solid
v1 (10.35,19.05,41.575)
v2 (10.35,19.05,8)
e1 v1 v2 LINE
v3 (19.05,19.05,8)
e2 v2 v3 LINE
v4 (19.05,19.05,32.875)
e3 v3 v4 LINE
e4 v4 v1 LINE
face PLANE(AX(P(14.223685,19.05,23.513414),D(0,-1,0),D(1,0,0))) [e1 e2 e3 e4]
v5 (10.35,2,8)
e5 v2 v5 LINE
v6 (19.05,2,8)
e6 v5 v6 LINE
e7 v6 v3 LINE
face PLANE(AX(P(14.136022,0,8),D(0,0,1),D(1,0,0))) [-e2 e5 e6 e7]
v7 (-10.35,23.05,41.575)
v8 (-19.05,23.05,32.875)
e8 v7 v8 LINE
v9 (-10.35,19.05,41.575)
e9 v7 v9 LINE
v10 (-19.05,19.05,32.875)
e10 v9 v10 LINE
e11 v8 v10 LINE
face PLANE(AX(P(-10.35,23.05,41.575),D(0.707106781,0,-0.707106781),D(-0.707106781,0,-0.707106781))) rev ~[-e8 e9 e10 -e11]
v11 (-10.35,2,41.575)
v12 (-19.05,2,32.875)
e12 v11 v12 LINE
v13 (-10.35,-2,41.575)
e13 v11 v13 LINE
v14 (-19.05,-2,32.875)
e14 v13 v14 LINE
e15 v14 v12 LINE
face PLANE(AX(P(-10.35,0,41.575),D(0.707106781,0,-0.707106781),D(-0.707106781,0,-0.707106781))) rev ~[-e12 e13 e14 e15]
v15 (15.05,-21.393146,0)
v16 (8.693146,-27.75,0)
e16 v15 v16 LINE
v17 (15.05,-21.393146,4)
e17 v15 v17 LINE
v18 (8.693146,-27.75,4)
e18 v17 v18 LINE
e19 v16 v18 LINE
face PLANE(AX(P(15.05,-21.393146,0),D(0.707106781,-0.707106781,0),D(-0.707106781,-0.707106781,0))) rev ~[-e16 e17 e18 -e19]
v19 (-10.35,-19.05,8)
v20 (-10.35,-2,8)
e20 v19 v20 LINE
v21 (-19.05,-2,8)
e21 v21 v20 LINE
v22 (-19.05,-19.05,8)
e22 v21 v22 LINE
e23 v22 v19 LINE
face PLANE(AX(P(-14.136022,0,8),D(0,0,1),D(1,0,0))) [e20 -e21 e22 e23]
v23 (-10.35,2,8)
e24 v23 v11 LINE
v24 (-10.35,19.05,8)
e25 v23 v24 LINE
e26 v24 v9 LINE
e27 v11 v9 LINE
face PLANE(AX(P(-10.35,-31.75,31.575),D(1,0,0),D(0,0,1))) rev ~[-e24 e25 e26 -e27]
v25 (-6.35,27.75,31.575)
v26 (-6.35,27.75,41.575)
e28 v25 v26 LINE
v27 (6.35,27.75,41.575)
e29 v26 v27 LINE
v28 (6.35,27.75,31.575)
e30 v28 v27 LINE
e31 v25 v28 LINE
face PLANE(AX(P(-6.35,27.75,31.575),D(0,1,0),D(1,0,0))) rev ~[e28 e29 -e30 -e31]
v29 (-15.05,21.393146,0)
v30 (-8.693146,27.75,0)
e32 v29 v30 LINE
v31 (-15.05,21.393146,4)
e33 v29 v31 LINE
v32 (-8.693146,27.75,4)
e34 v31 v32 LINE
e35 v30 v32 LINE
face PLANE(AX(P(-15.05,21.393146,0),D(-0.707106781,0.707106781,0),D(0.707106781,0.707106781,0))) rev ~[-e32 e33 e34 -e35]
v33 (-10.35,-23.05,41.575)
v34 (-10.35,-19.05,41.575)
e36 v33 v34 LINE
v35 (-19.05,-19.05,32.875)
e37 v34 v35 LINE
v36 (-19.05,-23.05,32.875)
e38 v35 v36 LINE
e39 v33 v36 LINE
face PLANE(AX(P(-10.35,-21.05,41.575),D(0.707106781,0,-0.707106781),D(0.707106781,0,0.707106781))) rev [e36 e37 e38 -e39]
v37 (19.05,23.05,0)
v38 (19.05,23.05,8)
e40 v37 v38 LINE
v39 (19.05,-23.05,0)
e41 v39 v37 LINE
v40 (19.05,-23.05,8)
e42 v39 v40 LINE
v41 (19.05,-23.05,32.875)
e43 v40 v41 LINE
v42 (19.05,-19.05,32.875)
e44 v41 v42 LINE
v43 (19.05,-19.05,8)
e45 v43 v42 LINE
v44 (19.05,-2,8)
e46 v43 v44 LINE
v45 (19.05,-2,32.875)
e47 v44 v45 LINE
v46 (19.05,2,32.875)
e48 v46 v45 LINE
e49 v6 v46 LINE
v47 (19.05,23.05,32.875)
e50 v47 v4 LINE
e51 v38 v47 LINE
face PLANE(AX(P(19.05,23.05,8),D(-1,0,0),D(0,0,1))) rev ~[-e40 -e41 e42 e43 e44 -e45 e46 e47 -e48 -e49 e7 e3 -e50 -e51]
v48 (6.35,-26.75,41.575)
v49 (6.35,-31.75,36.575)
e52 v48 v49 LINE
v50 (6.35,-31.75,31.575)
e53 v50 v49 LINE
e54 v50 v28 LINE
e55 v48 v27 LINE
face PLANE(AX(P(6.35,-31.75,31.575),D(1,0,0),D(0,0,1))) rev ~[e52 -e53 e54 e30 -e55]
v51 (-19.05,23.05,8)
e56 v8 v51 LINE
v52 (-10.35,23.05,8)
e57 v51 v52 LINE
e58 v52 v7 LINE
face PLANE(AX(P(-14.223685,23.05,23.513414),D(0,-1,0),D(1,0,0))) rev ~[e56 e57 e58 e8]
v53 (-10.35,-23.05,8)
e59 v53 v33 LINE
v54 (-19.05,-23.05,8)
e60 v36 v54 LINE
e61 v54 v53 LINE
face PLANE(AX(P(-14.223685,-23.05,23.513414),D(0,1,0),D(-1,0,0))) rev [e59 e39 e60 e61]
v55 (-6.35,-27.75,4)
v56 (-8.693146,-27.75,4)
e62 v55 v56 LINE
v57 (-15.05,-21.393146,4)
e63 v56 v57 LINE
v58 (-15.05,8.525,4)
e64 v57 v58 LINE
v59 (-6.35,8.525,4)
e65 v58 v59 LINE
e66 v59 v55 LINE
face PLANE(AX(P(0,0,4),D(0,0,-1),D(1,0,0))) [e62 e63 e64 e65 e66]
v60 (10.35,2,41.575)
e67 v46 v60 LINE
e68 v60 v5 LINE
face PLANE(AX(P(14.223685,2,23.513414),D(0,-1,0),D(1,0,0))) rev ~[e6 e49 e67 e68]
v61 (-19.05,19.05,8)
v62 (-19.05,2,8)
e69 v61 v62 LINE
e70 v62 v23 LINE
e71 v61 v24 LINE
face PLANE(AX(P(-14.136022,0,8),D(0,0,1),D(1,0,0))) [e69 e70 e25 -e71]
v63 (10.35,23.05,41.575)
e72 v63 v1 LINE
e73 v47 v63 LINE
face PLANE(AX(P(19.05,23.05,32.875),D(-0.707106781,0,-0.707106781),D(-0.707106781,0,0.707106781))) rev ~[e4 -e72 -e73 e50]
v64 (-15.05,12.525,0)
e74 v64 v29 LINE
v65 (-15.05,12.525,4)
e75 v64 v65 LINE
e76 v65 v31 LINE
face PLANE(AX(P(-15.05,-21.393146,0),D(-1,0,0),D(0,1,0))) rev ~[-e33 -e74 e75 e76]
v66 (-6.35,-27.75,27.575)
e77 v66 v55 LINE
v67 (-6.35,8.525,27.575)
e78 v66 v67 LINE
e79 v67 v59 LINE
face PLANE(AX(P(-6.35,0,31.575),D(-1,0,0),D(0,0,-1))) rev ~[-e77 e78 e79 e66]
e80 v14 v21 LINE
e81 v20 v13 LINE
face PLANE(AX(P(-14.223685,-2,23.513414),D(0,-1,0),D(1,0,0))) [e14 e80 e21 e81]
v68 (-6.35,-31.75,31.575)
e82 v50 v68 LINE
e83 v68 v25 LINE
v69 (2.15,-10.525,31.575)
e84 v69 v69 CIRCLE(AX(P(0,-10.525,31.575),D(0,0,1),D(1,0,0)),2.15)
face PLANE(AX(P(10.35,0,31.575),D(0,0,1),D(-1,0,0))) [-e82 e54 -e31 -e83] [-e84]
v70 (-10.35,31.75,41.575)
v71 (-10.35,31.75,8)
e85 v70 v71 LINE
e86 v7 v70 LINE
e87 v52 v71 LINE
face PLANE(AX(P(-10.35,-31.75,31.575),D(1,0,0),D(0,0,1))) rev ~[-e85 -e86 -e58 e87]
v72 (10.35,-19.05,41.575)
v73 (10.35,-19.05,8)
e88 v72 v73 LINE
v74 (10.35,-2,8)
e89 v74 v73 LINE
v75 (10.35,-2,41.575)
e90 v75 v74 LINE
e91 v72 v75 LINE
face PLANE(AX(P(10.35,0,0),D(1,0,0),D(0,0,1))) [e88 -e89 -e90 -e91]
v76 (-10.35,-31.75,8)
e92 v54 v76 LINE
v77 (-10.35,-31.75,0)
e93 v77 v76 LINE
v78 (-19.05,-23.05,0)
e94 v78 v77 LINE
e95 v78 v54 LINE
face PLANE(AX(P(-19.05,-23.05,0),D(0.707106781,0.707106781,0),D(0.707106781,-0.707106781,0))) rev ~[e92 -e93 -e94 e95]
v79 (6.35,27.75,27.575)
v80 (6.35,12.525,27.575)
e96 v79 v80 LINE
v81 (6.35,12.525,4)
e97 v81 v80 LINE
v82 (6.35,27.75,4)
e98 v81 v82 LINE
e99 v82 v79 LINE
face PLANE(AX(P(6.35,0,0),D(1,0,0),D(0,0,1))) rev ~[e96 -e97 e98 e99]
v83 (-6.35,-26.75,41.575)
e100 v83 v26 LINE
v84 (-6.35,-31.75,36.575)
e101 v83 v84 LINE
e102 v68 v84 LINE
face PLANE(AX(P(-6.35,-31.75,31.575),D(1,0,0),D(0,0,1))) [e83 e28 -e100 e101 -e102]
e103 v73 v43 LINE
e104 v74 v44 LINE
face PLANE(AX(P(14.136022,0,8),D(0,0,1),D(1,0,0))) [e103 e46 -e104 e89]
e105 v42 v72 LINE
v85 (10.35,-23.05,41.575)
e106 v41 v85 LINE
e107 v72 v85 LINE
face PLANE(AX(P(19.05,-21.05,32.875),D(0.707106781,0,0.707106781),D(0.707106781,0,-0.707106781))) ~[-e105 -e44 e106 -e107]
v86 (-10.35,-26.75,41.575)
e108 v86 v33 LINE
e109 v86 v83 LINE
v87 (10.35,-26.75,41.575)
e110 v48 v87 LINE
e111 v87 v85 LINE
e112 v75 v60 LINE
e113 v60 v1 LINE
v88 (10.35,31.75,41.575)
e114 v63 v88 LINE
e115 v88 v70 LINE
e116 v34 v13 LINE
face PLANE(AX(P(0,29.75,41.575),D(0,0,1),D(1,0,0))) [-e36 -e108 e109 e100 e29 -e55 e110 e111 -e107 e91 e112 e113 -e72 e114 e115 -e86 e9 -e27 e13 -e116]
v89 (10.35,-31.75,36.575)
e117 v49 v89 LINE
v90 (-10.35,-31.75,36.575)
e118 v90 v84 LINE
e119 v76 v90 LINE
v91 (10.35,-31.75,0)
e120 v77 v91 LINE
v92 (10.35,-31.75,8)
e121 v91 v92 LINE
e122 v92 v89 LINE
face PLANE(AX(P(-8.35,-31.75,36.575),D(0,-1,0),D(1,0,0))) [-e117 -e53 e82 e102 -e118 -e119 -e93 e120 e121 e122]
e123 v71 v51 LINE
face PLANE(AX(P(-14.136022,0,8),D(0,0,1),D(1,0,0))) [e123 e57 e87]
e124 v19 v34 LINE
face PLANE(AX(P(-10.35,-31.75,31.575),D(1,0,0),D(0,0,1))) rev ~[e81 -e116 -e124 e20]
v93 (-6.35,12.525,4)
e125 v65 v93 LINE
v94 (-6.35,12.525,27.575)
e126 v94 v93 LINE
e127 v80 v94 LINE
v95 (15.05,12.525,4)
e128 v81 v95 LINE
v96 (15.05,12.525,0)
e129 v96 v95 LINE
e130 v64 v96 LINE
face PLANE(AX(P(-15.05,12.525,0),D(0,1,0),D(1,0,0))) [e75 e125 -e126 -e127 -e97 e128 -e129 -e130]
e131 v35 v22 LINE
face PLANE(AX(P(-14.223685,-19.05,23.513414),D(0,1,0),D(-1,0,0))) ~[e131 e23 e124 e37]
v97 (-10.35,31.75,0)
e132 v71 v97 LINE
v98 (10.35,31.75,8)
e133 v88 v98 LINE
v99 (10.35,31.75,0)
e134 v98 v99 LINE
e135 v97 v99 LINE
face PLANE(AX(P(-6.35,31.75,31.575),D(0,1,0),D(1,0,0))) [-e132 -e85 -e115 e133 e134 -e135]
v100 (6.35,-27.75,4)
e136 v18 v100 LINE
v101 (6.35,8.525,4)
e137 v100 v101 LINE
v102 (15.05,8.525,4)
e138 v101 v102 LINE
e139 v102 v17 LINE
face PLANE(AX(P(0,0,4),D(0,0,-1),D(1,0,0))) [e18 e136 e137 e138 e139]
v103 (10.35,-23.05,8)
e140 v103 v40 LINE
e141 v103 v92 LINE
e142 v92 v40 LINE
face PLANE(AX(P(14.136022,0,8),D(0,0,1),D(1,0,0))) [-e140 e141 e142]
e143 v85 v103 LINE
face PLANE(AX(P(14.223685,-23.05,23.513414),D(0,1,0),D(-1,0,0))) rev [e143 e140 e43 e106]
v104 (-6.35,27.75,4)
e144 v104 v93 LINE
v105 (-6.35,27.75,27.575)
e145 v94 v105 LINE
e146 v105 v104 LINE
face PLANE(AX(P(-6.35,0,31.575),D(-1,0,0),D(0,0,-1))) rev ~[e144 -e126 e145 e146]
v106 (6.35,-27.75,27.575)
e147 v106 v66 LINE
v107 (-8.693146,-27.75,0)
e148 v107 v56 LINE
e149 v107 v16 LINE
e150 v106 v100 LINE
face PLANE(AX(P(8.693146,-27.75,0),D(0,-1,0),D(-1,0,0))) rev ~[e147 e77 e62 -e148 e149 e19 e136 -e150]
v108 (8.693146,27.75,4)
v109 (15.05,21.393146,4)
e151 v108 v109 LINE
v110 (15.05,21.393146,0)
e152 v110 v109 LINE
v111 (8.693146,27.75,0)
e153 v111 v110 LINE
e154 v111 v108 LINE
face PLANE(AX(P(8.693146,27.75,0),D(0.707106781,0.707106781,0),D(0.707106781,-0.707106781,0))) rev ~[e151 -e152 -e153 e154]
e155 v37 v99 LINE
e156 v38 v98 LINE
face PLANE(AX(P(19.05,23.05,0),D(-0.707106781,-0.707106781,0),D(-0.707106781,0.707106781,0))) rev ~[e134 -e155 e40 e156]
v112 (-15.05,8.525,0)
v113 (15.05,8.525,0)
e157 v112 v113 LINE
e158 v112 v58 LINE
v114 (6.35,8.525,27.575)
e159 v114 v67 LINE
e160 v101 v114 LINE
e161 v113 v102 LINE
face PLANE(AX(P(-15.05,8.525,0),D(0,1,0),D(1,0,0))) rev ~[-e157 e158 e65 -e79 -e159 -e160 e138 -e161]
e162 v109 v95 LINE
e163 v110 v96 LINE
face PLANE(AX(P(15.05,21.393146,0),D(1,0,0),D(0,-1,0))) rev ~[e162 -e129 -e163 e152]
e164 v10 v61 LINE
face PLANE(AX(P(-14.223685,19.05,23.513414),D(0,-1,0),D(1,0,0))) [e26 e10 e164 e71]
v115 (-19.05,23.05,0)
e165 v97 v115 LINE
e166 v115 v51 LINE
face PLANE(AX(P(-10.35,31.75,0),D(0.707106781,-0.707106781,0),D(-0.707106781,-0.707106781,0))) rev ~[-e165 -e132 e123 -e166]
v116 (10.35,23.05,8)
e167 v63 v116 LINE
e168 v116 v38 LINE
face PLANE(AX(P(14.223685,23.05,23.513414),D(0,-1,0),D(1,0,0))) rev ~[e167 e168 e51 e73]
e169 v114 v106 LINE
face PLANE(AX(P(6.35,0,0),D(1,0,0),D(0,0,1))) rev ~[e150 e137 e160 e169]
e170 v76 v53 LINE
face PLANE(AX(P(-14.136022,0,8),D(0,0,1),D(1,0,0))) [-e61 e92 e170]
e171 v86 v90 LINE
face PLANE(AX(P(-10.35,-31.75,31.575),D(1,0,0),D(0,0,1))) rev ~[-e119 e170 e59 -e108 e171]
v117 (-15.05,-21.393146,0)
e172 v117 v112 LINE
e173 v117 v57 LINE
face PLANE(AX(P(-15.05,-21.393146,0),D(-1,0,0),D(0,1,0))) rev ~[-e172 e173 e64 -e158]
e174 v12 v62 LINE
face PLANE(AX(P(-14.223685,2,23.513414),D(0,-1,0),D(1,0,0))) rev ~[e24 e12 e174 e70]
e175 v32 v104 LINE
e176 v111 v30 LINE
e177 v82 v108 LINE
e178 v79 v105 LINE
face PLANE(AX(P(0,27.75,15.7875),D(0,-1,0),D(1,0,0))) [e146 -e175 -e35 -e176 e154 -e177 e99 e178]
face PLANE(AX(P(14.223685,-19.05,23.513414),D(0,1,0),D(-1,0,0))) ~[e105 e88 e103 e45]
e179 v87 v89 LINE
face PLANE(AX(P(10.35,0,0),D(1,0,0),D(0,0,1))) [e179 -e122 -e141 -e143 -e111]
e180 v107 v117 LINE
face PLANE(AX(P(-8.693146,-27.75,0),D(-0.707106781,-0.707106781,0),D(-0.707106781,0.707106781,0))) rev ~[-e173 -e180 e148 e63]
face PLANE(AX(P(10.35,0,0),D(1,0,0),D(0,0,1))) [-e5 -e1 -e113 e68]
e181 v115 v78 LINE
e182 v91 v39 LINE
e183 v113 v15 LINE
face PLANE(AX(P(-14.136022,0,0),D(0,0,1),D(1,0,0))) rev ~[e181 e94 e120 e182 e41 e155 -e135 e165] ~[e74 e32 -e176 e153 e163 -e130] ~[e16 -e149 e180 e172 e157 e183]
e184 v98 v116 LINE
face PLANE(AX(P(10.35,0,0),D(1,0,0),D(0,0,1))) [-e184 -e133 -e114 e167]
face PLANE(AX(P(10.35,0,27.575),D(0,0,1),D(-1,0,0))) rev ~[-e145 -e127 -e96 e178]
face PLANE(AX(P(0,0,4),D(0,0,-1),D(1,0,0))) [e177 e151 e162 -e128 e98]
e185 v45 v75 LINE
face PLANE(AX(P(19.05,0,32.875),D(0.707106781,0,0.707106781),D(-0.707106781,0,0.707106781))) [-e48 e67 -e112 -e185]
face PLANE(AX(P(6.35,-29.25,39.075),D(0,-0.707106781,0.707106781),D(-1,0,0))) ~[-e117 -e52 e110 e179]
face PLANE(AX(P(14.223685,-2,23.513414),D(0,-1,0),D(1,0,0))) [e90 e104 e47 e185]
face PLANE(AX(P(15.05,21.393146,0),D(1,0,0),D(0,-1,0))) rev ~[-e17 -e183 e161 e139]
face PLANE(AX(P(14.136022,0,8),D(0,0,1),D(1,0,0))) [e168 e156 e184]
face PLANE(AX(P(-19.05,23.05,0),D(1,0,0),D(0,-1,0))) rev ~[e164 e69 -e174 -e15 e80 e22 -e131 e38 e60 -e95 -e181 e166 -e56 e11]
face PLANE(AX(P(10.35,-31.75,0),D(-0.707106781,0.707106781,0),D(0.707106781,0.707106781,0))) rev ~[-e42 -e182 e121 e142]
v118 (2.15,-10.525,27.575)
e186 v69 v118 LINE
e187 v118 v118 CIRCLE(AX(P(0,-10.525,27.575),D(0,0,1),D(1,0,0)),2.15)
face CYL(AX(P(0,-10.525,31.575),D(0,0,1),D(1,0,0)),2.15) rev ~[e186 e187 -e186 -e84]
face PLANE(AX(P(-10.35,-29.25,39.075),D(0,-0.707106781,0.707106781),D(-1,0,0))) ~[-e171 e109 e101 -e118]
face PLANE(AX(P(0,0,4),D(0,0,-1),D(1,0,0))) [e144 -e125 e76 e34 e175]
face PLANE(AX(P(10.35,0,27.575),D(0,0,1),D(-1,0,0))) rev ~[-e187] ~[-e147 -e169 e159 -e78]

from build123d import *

# Parameters (mm, degrees)
F1_DEPTH  = 31.75
F2_T      = -4
F3_W      = 4
F3_H      = 10
F4_DEPTH  = 63.5
F6_DEPTH  = 8
F8_DEPTH  = 2
F11_DEPTH = 4
F13_DEPTH = 4
F14_W     = 12.7
F14_H     = 4
F15_DEPTH = 10
F16_SIZE  = 5
F17_R     = 2.15
F18_DEPTH = 25
F19_W     = 30.1
F19_H     = 4


# Not quite as in the source:
# - a pattern or mirror of a feature is missing from the dataset's text; its kind, count and spacing are read off the source's solid


with BuildPart() as f1:
    # F0 (on Front) → F1 (new body, symmetric)
    with BuildSketch(Plane.XZ):
        Polygon((-10.35, 0), (10.35, 0), (10.35, 31.575), (6.35, 31.575), (-6.35, 31.575), (-10.35, 31.575), align=None)
    extrude(amount=F1_DEPTH, both=True)

    # F2
    f2_openings = [f1.faces().sort_by_distance(p)[0] for p in [
        (0, 0, 0),
    ]]
    offset(amount=F2_T, openings=f2_openings)

    # F3 (on face) → F4 (join, through all)
    with BuildSketch(Plane.XZ.offset(31.75)):
        with Locations((-8.35, 36.575)):
            Rectangle(F3_W, F3_H)
        with Locations((8.35, 36.575)):
            Rectangle(F3_W, F3_H)
    extrude(amount=-F4_DEPTH)

    # F5 (on Top) → F6 (join)
    with BuildSketch(Plane.XY):
        Polygon((-19.05, -23.05), (-10.35, -31.75), (-10.35, 31.75), (-19.05, 23.05), align=None)
        Polygon((10.35, 31.75), (10.35, -31.75), (19.05, -23.05), (19.05, 23.05), align=None)
    extrude(amount=F6_DEPTH)

    # F7 (on Front) → F8 (join, symmetric)
    with BuildSketch(Plane.XZ):
        Polygon((-19.05, 8), (-10.35, 8), (-10.35, 41.575), (-19.05, 32.875), align=None)
        Polygon((10.35, 8), (19.05, 8), (19.05, 32.875), (10.35, 41.575), align=None)
    f8 = extrude(amount=F8_DEPTH, both=True)

    # F8_copies: F8 across plane
    add(f8.mirror(Plane(origin=(0, -10.525, 0), x_dir=(0, 0, -1), z_dir=(0, -1, 0))))

    # F10 (on plane+point) → F11 (join)
    with BuildSketch(Plane.XZ.offset(-23.05)):
        Polygon((10.35, 8), (19.05, 8), (19.05, 32.875), (10.35, 41.575), align=None)
        Polygon((-19.05, 32.875), (-19.05, 8), (-10.35, 8), (-10.35, 41.575), align=None)
    extrude(amount=F11_DEPTH)

    # F12 (on face) → F13 (cut)
    with BuildSketch(Plane(origin=(0, 0, 0), x_dir=(1, 0, 0), z_dir=(0, 0, -1))):
        Polygon((-8.6931457505, -27.75), (8.6931457505, -27.75), (15.05, -21.3931457505), (15.05, 21.3931457505), (8.6931457505, 27.75), (-8.6931457505, 27.75), (-15.05, 21.3931457505), (-15.05, -21.3931457505), align=None)
    extrude(amount=-F13_DEPTH, mode=Mode.SUBTRACT)

    # F14 (on face) → F15 (join, through all)
    with BuildSketch(Plane.XY.offset(31.575)):
        with Locations((0, 29.75)):
            Rectangle(F14_W, F14_H)
    extrude(amount=F15_DEPTH)

    # F16
    f16_edges = [f1.edges().sort_by_distance(p)[0] for p in [
        (8.35, -31.75, 41.575),
        (-8.35, -31.75, 41.575),
    ]]
    chamfer(f16_edges, length=F16_SIZE)

    # F17 (on face) → F18 (cut)
    with BuildSketch(Plane.XY.offset(31.575)):
        with Locations((0, -10.525)):
            Circle(F17_R)
    extrude(amount=-F18_DEPTH, mode=Mode.SUBTRACT)

    # F19 (on face) → F20 (join, up to the next surface of F1)
    with BuildSketch(Plane(origin=(0, 0, 0), x_dir=(1, 0, 0), z_dir=(0, 0, -1))):
        with Locations((0, -10.525)):
            Rectangle(F19_W, F19_H)
    extrude(until=Until.NEXT, dir=(0, 0, 1))


solid = f1.part
